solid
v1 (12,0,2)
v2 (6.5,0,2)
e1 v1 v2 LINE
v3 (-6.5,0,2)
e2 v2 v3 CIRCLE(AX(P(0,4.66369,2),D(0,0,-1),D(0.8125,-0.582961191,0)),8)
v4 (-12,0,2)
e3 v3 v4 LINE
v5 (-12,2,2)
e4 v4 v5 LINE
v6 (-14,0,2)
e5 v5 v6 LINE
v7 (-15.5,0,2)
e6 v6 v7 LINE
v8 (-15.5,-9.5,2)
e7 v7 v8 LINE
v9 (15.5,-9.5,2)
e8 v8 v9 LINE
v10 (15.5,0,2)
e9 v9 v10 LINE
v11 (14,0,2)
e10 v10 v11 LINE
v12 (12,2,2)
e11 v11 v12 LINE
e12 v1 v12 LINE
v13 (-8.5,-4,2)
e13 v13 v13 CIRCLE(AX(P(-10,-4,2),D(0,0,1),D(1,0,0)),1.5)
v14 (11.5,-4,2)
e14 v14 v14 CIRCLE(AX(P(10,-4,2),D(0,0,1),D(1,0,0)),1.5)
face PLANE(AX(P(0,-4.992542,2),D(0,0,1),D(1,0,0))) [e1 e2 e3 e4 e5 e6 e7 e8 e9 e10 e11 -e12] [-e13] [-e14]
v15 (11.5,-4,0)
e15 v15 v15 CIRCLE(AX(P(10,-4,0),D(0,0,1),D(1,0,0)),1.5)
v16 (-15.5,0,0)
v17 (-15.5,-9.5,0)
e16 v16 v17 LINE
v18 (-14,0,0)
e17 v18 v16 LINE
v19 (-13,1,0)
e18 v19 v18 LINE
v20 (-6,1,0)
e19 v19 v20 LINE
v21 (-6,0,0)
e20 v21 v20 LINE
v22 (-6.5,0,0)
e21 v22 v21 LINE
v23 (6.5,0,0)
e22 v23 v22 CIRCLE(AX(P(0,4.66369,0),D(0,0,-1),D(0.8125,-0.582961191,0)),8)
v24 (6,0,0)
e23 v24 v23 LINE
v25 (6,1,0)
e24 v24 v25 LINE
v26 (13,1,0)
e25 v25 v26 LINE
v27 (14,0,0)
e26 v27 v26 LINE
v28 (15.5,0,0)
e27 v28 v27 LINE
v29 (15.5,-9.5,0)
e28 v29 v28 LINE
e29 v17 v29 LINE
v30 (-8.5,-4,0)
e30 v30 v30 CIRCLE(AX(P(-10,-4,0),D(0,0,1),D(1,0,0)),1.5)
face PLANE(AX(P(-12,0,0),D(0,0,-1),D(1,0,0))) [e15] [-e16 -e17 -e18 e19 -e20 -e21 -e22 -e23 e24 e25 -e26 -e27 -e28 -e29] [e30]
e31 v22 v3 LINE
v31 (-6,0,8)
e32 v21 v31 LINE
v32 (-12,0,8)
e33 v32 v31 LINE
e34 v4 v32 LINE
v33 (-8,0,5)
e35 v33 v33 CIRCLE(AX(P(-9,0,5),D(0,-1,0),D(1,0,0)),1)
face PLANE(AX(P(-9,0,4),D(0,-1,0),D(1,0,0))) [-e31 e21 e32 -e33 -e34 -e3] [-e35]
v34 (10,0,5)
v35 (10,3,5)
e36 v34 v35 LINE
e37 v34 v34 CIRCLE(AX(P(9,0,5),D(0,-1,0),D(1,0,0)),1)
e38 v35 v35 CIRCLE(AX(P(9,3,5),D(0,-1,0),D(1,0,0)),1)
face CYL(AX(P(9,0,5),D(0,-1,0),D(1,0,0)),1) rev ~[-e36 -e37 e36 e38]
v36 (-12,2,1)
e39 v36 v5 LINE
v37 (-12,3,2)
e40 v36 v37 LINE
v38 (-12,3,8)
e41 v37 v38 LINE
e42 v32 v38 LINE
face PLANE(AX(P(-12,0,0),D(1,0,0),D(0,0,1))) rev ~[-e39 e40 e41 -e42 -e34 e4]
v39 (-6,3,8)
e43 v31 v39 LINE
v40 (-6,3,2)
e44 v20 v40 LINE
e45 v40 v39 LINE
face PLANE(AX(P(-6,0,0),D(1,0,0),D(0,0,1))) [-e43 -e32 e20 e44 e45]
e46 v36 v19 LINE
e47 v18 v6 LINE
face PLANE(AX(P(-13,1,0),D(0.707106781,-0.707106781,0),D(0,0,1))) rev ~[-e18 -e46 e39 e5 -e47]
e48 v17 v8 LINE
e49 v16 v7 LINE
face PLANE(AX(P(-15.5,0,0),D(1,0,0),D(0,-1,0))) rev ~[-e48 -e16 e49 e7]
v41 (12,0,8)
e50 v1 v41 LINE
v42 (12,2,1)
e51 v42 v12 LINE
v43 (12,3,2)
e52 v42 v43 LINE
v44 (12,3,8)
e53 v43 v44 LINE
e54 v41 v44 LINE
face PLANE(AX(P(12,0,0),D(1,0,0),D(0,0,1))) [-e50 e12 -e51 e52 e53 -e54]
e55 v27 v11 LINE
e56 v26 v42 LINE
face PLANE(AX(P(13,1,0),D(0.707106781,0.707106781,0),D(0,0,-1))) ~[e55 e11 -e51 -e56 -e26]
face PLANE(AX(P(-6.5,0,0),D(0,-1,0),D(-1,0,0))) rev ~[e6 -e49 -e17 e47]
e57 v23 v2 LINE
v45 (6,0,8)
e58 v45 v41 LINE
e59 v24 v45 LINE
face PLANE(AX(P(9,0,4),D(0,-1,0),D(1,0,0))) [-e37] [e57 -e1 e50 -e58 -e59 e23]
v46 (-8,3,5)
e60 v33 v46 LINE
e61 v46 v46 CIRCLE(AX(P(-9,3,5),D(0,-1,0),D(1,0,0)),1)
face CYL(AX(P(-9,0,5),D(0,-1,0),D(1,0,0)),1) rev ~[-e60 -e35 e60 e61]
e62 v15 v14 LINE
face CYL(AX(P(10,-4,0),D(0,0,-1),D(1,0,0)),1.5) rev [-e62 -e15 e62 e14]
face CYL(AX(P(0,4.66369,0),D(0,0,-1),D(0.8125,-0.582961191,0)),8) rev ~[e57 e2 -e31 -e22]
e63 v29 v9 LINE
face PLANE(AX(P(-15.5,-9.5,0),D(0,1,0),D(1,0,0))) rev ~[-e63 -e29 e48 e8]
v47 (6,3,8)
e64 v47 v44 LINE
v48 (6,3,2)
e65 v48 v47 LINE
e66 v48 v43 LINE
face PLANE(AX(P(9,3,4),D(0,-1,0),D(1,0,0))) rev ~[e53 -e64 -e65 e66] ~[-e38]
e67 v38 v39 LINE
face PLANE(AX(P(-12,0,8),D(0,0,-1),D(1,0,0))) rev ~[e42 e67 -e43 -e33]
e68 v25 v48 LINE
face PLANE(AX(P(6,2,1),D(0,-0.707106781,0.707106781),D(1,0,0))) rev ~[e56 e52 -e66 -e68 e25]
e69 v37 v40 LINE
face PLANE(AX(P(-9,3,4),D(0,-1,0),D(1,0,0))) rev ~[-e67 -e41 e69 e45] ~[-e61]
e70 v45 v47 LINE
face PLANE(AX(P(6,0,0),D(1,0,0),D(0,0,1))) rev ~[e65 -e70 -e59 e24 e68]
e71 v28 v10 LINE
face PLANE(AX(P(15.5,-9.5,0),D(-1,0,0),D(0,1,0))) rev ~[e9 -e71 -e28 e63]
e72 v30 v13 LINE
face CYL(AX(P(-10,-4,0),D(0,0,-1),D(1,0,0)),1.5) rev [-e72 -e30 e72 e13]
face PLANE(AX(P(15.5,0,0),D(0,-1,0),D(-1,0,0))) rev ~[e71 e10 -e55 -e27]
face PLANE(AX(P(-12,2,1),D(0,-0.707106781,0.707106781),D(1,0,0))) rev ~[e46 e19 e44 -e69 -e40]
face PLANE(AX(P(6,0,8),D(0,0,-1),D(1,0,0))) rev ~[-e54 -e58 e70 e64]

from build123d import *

# Parameters (mm, degrees)
F0_R     = 1.5
F1_DEPTH = 2
F2_W     = 6
F2_H     = 8
F2_R     = 1
F3_DEPTH = 3
F4_SIZE  = 2
F5_SIZE  = 2


with BuildPart() as f1:
    # F0 (on Top) → F1 (new body)
    with BuildSketch(Plane.XY):
        with BuildLine():
            Line((-6.5, 0), (-15.5, 0))
            Line((-15.5, 0), (-15.5, -9.5))
            Line((-15.5, -9.5), (15.5, -9.5))
            Line((15.5, -9.5), (15.5, 0))
            Line((15.5, 0), (6.5, 0))
            ThreePointArc((6.5, 0), (0, -3.3363104735), (-6.5, 0))
        make_face()
        with Locations((-10, -4)):
            Circle(F0_R, mode=Mode.SUBTRACT)
        with Locations((10, -4)):
            Circle(F0_R, mode=Mode.SUBTRACT)
    extrude(amount=F1_DEPTH)

    # F2 (on Front) → F3 (join)
    with BuildSketch(Plane.XZ):
        with Locations((-9, 4)):
            Rectangle(F2_W, F2_H)
        with Locations((-9, 5)):
            Circle(F2_R, mode=Mode.SUBTRACT)
        with Locations((9, 4)):
            Rectangle(F2_W, F2_H)
        with Locations((9, 5)):
            Circle(F2_R, mode=Mode.SUBTRACT)
    extrude(amount=-F3_DEPTH)

    # F4
    f4_edges = [f1.edges().sort_by_distance(p)[0] for p in [
        (9, 3, 0),
        (-9, 3, 0),
    ]]
    chamfer(f4_edges, length=F4_SIZE)

    # F5
    f5_edges = [f1.edges().sort_by_distance(p)[0] for p in [
        (-12, 0, 1),
        (12, 0, 1),
    ]]
    chamfer(f5_edges, length=F5_SIZE)


solid = f1.part
